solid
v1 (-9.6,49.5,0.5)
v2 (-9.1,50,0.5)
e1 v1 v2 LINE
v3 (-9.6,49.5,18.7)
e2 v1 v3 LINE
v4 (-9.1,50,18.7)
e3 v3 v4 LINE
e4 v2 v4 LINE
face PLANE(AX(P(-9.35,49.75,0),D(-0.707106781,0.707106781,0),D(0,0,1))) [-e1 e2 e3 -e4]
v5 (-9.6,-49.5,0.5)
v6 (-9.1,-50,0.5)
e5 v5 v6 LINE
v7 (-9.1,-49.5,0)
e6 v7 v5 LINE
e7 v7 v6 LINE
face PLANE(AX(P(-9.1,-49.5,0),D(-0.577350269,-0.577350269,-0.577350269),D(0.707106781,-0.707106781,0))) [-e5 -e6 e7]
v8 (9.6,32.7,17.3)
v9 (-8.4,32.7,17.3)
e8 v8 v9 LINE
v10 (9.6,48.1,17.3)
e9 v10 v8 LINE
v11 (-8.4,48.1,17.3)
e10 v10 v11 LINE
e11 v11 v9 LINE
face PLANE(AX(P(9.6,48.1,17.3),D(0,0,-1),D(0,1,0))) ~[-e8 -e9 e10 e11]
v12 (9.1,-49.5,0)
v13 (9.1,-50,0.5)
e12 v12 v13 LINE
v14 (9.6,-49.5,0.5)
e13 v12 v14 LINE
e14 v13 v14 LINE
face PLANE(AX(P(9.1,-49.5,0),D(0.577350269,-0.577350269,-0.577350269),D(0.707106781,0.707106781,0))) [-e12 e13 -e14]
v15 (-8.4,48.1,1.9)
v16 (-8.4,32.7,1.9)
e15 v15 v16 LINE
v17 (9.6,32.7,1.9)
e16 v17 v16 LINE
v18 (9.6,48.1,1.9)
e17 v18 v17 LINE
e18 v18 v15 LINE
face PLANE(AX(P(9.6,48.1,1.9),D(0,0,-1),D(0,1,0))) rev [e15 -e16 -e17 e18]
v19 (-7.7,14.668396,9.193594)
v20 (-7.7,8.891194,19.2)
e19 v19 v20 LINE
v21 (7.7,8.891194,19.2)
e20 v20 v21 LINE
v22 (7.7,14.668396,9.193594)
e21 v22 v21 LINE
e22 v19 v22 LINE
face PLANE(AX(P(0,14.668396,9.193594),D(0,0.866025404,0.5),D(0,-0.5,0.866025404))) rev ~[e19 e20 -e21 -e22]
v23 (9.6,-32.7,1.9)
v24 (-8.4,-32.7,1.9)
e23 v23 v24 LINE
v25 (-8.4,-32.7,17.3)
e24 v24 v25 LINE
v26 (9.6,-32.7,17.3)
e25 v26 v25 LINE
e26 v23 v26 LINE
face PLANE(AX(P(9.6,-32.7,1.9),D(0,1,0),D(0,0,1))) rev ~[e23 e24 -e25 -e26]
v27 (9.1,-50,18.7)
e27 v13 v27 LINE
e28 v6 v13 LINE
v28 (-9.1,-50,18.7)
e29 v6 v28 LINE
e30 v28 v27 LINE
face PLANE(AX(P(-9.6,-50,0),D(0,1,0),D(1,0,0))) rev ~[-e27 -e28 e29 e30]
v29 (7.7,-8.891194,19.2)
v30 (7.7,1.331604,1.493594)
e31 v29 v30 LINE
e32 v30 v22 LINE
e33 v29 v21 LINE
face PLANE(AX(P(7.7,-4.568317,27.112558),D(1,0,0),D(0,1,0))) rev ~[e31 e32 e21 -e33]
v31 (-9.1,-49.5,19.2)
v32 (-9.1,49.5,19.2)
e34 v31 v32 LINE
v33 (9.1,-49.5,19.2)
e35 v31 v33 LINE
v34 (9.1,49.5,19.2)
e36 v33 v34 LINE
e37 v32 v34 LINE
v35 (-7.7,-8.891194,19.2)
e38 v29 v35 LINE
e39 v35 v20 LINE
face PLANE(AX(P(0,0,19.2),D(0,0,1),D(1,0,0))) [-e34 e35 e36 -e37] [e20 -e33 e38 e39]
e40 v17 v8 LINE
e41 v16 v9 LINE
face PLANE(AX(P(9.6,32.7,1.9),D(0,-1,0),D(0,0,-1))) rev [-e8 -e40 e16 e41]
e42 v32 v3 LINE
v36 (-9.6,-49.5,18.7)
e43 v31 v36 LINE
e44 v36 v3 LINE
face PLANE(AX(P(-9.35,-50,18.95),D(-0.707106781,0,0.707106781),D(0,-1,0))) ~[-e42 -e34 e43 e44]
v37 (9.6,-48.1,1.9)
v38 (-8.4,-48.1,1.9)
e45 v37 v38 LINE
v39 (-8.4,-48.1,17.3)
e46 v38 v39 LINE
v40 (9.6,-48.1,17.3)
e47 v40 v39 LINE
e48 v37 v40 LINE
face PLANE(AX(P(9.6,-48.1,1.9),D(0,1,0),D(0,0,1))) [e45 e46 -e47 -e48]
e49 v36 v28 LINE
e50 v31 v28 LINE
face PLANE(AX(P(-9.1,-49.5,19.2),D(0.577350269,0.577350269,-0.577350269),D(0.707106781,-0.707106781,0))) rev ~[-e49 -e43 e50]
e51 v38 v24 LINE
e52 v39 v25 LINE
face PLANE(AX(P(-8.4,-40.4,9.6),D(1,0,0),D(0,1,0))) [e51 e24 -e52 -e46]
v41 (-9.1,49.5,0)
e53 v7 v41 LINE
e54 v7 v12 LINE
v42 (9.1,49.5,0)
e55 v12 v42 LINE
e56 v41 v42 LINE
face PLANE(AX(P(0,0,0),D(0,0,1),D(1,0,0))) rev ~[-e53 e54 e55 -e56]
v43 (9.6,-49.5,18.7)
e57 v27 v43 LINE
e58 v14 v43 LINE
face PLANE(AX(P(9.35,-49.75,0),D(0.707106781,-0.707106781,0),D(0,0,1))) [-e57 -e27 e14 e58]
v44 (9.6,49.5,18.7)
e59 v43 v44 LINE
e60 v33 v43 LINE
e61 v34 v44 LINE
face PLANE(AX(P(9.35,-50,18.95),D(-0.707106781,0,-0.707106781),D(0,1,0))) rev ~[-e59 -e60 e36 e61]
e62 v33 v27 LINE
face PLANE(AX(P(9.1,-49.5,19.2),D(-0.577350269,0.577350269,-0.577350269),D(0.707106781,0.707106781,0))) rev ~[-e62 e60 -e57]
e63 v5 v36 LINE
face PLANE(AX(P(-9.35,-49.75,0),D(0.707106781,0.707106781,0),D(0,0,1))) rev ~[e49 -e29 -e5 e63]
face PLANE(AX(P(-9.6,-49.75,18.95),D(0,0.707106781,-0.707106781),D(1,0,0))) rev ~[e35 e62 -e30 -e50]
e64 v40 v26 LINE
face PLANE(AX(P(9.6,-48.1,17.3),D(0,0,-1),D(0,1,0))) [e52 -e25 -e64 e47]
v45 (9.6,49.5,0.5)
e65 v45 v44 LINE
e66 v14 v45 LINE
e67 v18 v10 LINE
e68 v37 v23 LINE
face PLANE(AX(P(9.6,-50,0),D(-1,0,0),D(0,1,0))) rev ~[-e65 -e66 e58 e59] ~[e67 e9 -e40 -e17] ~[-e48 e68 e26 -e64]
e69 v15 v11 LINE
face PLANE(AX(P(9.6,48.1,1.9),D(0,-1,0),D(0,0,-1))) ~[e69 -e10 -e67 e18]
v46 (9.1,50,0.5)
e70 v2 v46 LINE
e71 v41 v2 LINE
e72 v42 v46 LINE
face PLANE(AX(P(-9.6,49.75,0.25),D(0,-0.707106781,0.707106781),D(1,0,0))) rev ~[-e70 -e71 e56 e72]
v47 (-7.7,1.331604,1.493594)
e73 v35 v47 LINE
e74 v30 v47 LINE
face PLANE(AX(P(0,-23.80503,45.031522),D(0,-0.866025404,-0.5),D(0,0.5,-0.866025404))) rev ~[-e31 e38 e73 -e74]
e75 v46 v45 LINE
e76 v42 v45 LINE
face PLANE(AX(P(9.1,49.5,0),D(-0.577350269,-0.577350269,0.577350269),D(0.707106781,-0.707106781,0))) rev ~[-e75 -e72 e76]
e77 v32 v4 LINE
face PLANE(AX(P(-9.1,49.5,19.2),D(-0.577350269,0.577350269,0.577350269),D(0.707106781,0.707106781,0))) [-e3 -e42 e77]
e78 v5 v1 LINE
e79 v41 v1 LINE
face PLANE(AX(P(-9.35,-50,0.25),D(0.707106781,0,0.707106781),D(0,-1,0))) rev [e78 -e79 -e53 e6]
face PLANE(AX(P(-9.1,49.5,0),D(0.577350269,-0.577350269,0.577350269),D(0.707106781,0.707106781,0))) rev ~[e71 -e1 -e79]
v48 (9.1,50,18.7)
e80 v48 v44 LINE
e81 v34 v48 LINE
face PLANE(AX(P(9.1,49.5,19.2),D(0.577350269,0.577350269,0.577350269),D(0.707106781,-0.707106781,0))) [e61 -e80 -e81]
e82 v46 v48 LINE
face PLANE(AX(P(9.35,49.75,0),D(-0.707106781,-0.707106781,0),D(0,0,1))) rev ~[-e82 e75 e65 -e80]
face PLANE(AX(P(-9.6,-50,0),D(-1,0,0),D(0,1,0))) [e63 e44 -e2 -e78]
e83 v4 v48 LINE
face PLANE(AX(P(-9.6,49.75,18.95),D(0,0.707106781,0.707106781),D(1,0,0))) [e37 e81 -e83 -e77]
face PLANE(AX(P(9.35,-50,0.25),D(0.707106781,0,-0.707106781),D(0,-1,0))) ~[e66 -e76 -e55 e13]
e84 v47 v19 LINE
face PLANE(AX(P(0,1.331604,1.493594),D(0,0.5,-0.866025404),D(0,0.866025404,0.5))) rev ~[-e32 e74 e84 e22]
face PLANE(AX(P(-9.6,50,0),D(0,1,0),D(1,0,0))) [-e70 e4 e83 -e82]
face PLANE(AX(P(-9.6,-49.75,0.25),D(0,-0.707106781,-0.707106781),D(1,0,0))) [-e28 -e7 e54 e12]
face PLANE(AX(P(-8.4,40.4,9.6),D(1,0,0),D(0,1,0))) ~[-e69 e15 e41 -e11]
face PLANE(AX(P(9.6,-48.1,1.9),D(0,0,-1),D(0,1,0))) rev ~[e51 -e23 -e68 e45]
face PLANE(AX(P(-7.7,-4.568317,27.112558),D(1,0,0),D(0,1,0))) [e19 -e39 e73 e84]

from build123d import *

# Parameters (mm, degrees)
F0_W          = 19.2
F0_H          = 100
F1_DEPTH      = 19.2
F2_W          = 15.4
F2_H          = 15.4
F3_DEPTH      = 18
F5_DEPTH      = 7.7
F5_DEPTH_BACK = 7.7
F6_SIZE       = 0.5


# Not quite as in the source:
# - a pattern or mirror of a feature is missing from the dataset's text; its kind, count and spacing are read off the source's solid


with BuildPart() as f1:
    # F0 (on Top) → F1 (new body)
    with BuildSketch(Plane.XY):
        Rectangle(F0_W, F0_H)
    extrude(amount=F1_DEPTH)

    # F2 (on face) → F3 (cut)
    with BuildSketch(Plane.YZ.offset(9.6)):
        with Locations((-40.4, 9.6)):
            Rectangle(F2_W, F2_H)
    f3 = extrude(amount=-F3_DEPTH, mode=Mode.SUBTRACT)

    # F3_copies: F3 across plane
    add(f3.mirror(Plane.ZX), mode=Mode.SUBTRACT)

    # F4 (on Right) → F5 (cut, two sides)
    with BuildSketch(Plane.YZ) as f5_sk:
        Polygon((1.3316043909, 1.4935935394), (8, 5.3435935394), (14.6683956091, 9.1935935394), (-10.4682390124, 52.7315218353), (-23.8050302307, 45.0315218353), align=None)
    extrude(amount=-F5_DEPTH, mode=Mode.SUBTRACT)
    extrude(f5_sk.sketch, amount=F5_DEPTH_BACK, mode=Mode.SUBTRACT)

    # F6
    f6_edges = [f1.edges().sort_by_distance(p)[0] for p in [
        (-9.6, 50, 9.6),
        (-9.6, -50, 9.6),
        (-9.6, 0, 0),
        (-9.6, 0, 19.2),
        (9.6, -50, 9.6),
        (0, -50, 0),
        (0, -50, 19.2),
        (9.6, 50, 9.6),
        (0, 50, 0),
        (0, 50, 19.2),
        (9.6, 0, 0),
        (9.6, 0, 19.2),
    ]]
    chamfer(f6_edges, length=F6_SIZE)


solid = f1.part
